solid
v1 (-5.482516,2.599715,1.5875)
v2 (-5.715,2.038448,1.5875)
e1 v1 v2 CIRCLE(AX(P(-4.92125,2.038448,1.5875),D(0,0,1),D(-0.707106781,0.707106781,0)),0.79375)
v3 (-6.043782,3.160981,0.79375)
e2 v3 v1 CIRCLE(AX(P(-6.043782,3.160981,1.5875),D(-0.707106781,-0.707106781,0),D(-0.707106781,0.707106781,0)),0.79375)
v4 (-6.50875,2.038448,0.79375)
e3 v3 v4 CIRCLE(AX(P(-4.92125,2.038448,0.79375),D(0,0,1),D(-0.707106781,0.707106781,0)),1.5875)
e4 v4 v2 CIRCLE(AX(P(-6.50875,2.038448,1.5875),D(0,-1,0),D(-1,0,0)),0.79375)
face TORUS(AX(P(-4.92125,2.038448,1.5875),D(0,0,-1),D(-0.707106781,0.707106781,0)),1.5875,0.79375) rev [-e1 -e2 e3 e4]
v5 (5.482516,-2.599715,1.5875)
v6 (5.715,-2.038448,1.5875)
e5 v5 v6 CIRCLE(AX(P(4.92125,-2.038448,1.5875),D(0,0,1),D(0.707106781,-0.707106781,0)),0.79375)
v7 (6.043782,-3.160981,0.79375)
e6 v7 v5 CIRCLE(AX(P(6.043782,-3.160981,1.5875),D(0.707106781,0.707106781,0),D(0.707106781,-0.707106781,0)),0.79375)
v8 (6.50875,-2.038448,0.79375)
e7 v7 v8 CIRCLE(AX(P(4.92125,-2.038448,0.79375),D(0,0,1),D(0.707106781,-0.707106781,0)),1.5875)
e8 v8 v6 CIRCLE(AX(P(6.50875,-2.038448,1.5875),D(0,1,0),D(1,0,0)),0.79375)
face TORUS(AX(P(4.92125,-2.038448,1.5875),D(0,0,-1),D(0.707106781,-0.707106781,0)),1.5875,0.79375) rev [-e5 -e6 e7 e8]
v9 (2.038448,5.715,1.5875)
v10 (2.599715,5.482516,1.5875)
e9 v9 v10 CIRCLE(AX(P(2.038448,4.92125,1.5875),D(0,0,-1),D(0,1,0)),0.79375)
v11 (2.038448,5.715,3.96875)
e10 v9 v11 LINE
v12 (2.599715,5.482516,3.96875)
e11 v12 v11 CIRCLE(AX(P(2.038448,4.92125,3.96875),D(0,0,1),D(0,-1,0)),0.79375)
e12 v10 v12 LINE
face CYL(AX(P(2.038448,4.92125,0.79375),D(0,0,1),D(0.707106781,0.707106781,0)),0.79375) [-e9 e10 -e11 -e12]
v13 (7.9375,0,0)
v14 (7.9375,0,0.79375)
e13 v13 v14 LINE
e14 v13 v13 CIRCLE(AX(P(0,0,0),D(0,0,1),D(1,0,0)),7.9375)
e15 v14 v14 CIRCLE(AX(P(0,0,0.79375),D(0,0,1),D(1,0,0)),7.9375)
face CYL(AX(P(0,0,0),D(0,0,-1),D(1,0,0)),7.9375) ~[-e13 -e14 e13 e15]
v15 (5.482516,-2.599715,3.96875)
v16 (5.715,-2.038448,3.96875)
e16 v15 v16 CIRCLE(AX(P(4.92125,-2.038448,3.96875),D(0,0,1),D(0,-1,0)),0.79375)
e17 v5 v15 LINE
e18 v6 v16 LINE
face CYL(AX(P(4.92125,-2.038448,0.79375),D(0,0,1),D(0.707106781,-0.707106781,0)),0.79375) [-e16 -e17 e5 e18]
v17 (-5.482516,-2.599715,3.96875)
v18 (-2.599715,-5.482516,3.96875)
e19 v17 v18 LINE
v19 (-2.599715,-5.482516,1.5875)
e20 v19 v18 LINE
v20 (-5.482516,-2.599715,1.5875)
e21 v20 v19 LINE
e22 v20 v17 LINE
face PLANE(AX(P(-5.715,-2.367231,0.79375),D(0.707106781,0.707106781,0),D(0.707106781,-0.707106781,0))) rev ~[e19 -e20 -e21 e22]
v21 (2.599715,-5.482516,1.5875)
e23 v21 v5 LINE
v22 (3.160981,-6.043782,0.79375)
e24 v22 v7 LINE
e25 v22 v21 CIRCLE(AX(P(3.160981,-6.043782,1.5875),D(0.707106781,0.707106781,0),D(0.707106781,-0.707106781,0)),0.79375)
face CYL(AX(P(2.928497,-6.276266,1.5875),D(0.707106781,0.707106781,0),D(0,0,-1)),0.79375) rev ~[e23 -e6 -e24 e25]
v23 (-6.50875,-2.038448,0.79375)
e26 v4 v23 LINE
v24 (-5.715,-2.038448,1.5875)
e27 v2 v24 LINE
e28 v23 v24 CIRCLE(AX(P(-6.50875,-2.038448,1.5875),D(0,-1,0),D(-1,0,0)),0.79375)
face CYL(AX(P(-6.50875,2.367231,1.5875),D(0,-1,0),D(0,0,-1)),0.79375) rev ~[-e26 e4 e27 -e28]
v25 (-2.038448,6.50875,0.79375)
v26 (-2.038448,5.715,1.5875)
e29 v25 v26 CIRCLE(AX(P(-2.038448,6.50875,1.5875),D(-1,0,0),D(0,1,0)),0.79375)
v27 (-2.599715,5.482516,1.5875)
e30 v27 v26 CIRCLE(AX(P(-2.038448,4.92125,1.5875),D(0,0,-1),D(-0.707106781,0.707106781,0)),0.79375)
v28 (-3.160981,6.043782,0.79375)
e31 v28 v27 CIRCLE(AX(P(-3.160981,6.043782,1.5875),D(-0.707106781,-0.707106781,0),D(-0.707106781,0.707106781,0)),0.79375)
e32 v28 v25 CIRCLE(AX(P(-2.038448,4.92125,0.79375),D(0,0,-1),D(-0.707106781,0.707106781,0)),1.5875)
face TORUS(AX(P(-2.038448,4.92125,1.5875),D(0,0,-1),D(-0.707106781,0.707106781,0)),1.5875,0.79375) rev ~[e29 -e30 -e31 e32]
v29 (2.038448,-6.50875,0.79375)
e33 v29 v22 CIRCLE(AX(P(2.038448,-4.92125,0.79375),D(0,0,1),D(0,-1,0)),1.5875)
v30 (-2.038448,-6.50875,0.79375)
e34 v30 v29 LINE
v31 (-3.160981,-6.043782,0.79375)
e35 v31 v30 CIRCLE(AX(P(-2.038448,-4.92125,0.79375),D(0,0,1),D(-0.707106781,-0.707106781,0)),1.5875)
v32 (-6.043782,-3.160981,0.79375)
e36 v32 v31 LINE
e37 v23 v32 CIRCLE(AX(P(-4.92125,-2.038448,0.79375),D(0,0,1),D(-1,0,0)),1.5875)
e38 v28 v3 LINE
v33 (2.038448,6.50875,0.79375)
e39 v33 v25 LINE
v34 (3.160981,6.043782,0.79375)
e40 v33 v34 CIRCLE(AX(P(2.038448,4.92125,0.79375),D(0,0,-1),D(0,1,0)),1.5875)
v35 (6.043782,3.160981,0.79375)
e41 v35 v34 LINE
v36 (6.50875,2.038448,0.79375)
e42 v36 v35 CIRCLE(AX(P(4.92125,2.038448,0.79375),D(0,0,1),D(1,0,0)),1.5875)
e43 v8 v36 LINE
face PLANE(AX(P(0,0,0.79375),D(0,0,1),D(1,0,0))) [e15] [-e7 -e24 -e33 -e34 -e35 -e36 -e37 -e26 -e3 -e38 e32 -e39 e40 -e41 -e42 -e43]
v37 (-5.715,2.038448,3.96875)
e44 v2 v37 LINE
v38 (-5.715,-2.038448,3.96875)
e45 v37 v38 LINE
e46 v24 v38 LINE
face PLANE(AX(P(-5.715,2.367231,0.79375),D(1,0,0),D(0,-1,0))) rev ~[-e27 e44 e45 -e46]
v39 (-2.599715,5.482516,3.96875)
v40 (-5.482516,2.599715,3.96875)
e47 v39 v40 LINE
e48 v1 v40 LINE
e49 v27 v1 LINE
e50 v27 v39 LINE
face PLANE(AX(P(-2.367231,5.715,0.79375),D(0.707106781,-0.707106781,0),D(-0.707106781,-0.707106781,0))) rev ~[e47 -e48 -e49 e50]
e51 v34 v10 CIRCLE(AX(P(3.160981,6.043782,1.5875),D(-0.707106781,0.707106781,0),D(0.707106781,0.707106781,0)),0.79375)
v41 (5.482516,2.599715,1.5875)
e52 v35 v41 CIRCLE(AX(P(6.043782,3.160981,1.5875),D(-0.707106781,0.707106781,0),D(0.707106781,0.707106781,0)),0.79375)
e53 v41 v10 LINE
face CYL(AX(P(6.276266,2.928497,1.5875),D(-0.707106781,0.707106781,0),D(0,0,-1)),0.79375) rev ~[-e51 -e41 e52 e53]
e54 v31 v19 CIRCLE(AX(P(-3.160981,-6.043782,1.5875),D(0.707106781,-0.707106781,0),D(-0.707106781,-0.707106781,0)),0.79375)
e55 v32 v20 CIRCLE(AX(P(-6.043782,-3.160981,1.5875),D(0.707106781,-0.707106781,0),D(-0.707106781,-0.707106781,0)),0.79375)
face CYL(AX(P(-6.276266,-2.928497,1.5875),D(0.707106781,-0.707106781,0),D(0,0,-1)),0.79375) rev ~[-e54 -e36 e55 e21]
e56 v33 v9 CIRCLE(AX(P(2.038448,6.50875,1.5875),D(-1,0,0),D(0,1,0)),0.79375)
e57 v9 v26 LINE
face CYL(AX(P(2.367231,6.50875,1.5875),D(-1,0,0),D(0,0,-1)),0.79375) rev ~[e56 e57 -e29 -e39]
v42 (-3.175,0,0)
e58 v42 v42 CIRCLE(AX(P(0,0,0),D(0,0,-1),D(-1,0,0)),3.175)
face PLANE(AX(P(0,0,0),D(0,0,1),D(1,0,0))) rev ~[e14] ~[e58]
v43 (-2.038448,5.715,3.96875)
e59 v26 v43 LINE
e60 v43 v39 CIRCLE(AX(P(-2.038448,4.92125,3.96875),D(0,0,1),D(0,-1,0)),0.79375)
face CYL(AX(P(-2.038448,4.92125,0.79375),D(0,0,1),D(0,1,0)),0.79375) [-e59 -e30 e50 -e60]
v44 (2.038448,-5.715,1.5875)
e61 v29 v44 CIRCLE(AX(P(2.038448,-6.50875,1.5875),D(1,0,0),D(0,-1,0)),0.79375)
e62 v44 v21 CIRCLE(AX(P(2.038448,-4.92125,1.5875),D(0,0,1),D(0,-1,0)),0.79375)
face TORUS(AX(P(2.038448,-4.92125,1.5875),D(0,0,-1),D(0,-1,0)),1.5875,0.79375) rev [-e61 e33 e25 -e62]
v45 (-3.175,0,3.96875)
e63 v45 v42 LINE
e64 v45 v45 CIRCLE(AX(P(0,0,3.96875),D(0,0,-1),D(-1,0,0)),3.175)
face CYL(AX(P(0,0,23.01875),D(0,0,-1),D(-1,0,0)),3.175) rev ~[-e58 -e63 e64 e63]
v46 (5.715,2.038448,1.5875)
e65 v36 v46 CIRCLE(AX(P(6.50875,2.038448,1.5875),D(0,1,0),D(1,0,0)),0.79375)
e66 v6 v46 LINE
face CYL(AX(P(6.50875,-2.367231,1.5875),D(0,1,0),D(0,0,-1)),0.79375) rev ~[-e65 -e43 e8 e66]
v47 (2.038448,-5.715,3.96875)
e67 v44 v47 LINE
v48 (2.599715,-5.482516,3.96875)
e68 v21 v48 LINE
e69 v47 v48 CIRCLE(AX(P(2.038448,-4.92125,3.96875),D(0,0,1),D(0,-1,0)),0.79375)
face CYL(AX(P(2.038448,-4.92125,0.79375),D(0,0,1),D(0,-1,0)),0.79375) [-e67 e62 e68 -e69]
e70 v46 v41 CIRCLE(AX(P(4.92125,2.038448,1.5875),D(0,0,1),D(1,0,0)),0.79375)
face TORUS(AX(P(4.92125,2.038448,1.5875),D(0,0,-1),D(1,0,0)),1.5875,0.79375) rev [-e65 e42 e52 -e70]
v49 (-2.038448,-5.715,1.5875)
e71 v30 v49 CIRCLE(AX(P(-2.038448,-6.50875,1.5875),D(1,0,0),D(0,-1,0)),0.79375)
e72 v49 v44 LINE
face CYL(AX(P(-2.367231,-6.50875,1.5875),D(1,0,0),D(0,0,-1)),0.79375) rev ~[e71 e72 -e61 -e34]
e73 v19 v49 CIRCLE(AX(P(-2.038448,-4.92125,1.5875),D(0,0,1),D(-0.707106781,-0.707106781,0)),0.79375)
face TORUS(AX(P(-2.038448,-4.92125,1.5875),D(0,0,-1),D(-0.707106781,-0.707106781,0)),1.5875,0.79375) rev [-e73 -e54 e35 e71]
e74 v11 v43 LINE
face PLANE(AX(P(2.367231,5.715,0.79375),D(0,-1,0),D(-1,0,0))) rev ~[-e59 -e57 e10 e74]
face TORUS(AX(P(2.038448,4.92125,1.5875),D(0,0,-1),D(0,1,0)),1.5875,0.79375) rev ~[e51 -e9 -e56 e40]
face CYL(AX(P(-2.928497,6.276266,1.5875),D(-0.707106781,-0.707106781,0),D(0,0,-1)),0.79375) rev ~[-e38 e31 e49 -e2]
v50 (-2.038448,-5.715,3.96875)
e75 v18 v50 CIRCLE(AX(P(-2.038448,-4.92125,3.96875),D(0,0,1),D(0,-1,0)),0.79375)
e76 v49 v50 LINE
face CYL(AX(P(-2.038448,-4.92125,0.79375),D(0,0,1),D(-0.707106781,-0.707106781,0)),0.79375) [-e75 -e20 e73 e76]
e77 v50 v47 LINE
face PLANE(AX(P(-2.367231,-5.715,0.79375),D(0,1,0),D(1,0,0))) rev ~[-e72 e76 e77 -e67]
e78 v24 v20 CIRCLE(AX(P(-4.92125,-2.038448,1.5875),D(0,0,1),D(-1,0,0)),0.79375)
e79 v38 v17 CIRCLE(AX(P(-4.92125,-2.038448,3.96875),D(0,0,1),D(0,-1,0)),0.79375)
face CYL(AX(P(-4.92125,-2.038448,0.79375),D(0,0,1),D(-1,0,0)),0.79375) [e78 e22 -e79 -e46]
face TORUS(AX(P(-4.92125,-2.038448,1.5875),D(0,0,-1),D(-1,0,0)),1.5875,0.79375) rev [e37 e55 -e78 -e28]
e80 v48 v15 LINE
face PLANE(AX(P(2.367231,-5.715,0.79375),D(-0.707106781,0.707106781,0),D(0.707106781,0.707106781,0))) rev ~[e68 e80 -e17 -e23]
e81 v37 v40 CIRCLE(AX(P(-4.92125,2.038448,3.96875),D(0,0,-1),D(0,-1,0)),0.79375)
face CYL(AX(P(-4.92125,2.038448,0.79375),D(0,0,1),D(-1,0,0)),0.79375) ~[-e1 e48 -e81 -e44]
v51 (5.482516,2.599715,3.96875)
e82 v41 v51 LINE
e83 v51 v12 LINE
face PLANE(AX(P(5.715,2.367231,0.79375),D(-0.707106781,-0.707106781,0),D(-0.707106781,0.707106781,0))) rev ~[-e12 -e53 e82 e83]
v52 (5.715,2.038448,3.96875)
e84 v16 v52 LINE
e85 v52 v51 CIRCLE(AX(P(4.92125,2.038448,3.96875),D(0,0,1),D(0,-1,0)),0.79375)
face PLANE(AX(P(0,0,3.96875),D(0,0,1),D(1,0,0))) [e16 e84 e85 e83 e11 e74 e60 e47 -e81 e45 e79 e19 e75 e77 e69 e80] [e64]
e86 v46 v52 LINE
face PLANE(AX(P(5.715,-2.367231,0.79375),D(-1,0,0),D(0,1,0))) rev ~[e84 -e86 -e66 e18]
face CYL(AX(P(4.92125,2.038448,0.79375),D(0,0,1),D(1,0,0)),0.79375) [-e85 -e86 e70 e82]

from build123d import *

# Parameters (mm, degrees)
F0_R     = 7.9375
F1_DEPTH = 0.79375
F3_DEPTH = 3.175
F4_R     = 0.79375
F6_D     = 6.35
F6_DEPTH = 19.05
F6_TIP   = 1.9077324654


with BuildPart() as f1:
    # F0 (on Top) → F1 (new body)
    with BuildSketch(Plane.XY):
        Circle(F0_R)
    extrude(amount=F1_DEPTH)

    # F2 (on face) → F3 (join)
    with BuildSketch(Plane.XY.offset(0.79375)):
        Polygon((-5.715, 2.367230509), (-5.715, -2.367230509), (-2.367230509, -5.715), (2.367230509, -5.715), (5.715, -2.367230509), (5.715, 2.367230509), (2.367230509, 5.715), (-2.367230509, 5.715), align=None)
    extrude(amount=F3_DEPTH)

    # F4
    f4_edges = [f1.edges().sort_by_distance(p)[0] for p in [
        (-5.715, -2.367231, 2.38125),
        (-2.367231, -5.715, 2.38125),
        (2.367231, -5.715, 2.38125),
        (5.715, -2.367231, 2.38125),
        (5.715, 2.367231, 2.38125),
        (2.367231, 5.715, 2.38125),
        (-2.367231, 5.715, 2.38125),
        (-5.715, 2.367231, 2.38125),
        (-4.041115, 4.041115, 0.79375),
        (0, 5.715, 0.79375),
        (-5.715, 0, 0.79375),
        (-4.041115, -4.041115, 0.79375),
        (0, -5.715, 0.79375),
        (4.041115, -4.041115, 0.79375),
        (5.715, 0, 0.79375),
        (4.041115, 4.041115, 0.79375),
    ]]
    fillet(f4_edges, radius=F4_R)

    # F6
    with Locations(Plane.XY.offset(3.96875)):
        with Locations((0, 0)):
            Hole(F6_D / 2, depth=F6_DEPTH)
            with Locations((0, 0, -(F6_DEPTH + F6_TIP / 2))):  # 118° drill point
                Cone(0, F6_D / 2, F6_TIP, mode=Mode.SUBTRACT)


solid = f1.part
